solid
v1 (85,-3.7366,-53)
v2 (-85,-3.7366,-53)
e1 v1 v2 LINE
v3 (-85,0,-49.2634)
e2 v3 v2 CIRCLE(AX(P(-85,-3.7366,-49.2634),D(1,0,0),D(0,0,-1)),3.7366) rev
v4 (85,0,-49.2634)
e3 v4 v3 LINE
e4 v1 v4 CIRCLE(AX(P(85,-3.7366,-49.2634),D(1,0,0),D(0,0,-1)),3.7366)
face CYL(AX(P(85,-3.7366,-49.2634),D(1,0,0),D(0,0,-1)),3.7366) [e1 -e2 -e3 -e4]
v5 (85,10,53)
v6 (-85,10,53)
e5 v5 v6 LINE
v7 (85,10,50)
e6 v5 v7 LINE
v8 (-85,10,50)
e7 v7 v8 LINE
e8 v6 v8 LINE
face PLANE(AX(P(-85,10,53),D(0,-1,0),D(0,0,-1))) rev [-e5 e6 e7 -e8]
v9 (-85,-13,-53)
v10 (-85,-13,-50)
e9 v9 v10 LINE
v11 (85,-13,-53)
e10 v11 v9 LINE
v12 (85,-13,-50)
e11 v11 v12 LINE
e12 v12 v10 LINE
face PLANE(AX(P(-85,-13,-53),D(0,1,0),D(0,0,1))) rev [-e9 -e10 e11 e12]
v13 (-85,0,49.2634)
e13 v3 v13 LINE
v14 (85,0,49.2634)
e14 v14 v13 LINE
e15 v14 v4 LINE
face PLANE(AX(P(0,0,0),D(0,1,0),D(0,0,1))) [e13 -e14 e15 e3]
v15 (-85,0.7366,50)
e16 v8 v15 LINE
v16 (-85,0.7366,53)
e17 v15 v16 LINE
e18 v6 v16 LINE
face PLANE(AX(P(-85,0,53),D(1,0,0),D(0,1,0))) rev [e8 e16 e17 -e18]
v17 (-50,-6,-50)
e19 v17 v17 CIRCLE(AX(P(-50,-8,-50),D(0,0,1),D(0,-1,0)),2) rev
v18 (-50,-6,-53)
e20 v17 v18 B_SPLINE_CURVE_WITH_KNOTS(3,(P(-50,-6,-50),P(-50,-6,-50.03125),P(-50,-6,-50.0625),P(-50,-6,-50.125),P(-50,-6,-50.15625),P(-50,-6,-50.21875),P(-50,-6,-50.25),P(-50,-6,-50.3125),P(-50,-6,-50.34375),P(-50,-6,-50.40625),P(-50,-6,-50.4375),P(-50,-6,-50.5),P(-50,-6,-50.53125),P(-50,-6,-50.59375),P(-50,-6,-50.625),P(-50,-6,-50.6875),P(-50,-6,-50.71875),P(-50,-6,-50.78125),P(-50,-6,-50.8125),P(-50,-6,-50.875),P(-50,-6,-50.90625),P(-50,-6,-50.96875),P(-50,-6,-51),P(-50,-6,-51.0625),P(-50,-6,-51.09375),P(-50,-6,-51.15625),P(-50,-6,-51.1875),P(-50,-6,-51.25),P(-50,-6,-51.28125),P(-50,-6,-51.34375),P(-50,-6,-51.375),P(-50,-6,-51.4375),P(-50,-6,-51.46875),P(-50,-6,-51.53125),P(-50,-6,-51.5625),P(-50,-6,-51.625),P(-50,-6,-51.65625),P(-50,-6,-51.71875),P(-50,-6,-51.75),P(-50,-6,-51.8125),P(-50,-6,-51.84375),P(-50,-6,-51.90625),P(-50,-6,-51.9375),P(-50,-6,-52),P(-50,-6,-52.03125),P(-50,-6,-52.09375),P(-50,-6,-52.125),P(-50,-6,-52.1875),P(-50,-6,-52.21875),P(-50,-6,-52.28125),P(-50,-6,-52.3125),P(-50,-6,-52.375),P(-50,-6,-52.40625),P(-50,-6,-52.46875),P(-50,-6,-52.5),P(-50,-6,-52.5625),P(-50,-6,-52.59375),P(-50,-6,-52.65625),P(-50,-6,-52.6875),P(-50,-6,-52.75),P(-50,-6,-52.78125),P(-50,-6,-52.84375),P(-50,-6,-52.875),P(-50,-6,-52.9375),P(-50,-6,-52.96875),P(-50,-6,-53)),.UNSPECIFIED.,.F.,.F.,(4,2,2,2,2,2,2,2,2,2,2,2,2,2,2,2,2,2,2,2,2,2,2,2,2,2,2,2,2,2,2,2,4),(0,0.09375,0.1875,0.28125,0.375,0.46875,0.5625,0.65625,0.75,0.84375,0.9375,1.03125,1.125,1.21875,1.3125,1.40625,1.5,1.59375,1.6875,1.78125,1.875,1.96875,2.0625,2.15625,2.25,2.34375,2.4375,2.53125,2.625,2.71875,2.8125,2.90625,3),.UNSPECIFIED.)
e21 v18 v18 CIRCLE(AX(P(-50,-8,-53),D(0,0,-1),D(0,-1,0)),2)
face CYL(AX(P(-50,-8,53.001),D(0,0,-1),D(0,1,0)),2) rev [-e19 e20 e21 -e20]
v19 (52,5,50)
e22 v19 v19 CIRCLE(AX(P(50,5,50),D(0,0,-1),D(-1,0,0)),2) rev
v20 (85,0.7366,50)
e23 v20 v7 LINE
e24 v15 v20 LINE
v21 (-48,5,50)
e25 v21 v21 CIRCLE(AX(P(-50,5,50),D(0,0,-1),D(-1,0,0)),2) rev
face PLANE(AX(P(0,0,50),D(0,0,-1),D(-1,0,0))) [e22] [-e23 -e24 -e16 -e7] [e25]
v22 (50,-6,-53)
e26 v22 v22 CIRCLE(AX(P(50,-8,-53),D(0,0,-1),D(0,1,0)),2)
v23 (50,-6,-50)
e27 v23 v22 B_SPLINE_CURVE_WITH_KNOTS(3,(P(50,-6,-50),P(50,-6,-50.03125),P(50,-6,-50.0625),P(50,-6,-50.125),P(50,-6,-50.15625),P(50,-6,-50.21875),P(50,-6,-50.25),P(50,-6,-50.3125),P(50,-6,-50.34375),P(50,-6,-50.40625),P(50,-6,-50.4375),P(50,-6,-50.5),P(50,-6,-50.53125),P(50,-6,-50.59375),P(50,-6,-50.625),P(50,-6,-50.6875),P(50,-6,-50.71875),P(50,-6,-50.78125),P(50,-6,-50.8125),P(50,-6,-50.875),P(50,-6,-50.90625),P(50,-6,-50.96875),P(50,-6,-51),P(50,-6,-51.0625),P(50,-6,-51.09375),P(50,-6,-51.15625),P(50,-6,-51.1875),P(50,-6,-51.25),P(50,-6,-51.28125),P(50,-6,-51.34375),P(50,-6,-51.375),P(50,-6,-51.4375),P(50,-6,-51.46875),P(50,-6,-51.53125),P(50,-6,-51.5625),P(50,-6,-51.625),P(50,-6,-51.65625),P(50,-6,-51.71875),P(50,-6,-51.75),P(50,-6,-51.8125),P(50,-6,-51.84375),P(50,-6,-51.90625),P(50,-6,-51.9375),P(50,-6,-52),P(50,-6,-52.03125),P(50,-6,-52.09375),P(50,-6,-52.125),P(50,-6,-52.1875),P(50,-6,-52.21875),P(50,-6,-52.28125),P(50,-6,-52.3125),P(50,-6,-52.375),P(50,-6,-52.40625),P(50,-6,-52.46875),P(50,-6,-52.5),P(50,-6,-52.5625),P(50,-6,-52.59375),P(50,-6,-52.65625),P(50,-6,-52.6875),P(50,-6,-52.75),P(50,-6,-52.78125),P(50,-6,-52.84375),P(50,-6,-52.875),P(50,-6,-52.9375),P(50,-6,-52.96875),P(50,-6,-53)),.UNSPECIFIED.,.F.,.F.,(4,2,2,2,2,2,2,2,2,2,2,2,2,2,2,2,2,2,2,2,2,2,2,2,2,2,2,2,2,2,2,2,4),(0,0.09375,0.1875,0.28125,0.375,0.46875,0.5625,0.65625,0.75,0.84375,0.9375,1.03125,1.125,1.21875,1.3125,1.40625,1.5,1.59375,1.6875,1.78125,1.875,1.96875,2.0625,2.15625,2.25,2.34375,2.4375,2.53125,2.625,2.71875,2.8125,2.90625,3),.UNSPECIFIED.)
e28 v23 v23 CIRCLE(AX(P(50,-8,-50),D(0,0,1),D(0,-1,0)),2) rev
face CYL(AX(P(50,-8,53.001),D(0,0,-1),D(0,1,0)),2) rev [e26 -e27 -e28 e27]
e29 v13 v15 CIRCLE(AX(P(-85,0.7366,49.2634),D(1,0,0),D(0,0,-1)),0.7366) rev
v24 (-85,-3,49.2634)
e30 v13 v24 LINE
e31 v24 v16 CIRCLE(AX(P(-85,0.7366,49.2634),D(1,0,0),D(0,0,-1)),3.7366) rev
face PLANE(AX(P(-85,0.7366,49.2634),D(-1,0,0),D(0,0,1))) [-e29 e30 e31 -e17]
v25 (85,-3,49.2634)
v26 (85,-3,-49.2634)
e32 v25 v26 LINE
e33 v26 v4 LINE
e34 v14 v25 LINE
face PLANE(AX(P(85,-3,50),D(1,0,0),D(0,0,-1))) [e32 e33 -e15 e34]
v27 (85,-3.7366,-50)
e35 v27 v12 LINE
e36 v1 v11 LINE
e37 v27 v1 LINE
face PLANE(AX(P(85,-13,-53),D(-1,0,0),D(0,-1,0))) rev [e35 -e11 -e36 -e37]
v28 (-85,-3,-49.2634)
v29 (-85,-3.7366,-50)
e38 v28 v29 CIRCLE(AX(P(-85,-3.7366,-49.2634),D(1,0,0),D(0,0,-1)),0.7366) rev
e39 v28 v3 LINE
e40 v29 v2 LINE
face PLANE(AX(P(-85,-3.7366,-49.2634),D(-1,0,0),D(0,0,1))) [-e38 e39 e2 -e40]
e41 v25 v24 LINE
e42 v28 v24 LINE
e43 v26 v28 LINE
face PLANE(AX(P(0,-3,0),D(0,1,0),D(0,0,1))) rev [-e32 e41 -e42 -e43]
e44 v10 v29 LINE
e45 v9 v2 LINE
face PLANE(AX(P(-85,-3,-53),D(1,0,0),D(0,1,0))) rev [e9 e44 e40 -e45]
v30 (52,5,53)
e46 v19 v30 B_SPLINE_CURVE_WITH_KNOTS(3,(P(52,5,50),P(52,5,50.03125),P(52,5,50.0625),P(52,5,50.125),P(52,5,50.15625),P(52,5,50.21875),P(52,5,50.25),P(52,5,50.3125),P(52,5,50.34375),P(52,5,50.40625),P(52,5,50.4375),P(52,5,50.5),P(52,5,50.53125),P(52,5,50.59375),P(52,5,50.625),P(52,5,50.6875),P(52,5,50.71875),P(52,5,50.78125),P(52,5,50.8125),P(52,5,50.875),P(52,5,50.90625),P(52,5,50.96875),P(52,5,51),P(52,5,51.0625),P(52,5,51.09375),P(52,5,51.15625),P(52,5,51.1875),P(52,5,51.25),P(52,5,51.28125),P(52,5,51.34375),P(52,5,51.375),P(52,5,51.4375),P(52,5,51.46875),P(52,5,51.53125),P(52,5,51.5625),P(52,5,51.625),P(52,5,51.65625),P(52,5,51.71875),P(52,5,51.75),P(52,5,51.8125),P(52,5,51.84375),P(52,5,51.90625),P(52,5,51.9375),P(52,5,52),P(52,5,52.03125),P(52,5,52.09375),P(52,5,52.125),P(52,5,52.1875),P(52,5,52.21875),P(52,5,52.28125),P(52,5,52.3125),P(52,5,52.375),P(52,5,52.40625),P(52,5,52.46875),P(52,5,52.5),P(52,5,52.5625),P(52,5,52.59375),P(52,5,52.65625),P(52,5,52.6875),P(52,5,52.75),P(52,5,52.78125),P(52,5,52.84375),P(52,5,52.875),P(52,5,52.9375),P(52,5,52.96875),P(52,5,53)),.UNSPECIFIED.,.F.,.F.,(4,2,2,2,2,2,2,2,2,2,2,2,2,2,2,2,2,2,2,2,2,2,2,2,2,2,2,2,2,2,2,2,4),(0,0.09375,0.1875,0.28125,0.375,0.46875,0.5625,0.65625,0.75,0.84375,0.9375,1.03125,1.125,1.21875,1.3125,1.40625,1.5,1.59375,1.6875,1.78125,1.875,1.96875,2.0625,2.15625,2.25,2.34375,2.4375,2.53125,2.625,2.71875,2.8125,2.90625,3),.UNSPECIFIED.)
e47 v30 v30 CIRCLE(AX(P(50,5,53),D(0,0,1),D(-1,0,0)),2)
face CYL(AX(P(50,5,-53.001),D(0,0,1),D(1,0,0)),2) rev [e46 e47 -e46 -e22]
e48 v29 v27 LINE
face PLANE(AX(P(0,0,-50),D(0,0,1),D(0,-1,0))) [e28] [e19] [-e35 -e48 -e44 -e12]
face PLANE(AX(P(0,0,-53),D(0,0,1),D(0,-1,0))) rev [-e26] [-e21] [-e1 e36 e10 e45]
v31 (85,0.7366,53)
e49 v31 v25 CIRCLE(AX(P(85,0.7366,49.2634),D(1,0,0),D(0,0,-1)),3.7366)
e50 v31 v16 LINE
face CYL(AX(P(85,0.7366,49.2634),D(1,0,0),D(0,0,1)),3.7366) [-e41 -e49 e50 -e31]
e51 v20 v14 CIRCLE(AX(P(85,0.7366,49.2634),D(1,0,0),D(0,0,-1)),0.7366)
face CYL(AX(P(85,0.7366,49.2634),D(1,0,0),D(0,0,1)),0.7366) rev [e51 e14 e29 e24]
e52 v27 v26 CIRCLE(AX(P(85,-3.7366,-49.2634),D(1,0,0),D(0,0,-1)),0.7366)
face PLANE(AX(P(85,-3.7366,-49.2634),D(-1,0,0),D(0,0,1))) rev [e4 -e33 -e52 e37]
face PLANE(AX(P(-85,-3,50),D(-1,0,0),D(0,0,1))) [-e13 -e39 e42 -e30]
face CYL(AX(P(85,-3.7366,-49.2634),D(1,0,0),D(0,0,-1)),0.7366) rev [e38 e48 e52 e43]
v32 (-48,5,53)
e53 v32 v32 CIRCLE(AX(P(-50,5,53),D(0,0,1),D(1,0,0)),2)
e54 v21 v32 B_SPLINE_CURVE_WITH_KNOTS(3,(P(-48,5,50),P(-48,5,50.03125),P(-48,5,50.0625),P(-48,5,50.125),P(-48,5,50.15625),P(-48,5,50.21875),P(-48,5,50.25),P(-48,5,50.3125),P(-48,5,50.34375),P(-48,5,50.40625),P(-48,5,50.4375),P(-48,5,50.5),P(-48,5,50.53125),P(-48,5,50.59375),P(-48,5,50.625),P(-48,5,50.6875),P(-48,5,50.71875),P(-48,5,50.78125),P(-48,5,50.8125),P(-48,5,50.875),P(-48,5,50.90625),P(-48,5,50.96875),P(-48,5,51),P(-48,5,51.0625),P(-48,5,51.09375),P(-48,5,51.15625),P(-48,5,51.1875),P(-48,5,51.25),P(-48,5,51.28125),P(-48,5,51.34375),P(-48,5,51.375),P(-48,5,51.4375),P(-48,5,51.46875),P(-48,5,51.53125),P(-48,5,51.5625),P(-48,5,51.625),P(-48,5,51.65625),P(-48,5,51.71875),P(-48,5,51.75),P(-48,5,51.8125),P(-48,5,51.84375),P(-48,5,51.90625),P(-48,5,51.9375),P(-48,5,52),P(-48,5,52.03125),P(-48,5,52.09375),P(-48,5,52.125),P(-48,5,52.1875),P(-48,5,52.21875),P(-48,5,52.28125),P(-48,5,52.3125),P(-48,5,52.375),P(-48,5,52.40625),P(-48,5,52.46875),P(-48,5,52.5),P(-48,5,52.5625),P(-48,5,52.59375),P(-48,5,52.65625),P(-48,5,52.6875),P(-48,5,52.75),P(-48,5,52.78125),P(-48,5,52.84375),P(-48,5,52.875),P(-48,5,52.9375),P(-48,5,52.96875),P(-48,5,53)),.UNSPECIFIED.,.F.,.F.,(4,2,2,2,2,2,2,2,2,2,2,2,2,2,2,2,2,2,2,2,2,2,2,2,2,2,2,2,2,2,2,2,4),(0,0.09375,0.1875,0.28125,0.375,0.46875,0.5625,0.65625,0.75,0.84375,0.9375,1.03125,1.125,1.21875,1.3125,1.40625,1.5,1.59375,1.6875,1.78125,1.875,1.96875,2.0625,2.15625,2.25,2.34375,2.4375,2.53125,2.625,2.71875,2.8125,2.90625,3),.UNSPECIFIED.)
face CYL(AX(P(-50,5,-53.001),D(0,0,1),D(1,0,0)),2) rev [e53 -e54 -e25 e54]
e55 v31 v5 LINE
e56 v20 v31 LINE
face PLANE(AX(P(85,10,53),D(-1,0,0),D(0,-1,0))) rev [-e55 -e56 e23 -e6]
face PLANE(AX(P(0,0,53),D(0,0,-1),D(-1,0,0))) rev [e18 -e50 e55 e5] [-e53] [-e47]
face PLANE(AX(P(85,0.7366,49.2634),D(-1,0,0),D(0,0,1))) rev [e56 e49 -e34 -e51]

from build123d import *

# Parameters (mm, degrees)
SKETCH_1_W                       = 170
SKETCH_1_H                       = 100
SM_BASE_FLANGE_1_DEPTH           = 3
SM_EDGE_FLANGE_3_STRIP_W         = 13.4732
SM_EDGE_FLANGE_3_STRIP_H         = 3
SM_EDGE_FLANGE_3_STRIP_CUT_DEPTH = 170
SM_EDGE_FLANGE_3_DEPTH           = 170
SM_EDGE_FLANGE_4_STRIP_W         = 13.4732
SM_EDGE_FLANGE_4_STRIP_H         = 3
SM_EDGE_FLANGE_4_STRIP_CUT_DEPTH = 170
SM_EDGE_FLANGE_4_DEPTH           = 170
CUT_EXTRUDE_2_REACH              = 138.492
SKETCH_19_R                      = 2
CUT_EXTRUDE_3_REACH              = 138.492
SKETCH_20_R                      = 2


# Sheet-metal steps are written as plain solids
with BuildPart() as part:
    # Sketch 1 → 基体-法兰1 (new body)
    with BuildSketch(Plane(origin=(0, 0, 0), x_dir=(1, 0, 0), z_dir=(0, 1, 0))):
        Rectangle(SKETCH_1_W, SKETCH_1_H)
    extrude(amount=-SM_BASE_FLANGE_1_DEPTH)

    # 边线-法兰3 strip (across the edge) → 边线-法兰3 strip cut (cut)
    with BuildSketch(Plane(origin=(-85, 0, 50), x_dir=(0, 0, -1), z_dir=(1, 0, 0))):
        with Locations((-6, -1.5)):
            Rectangle(SM_EDGE_FLANGE_3_STRIP_W, SM_EDGE_FLANGE_3_STRIP_H)
    extrude(amount=SM_EDGE_FLANGE_3_STRIP_CUT_DEPTH, mode=Mode.SUBTRACT)

    # 边线-法兰3 section (across the edge) → 边线-法兰3 (add)
    with BuildSketch(Plane(origin=(-85, 0, 50), x_dir=(0, 0, -1), z_dir=(1, 0, 0))):
        with BuildLine():
            Line((-3, 0.7366), (-3, 10))
            Line((-3, 10), (0, 10))
            Line((0, 10), (0, 0.7366))
            ThreePointArc((0, 0.7366), (0.215745145, 0.215745145), (0.7366, 0))
            Line((0.7366, 0), (0.7366, -3))
            ThreePointArc((0.7366, -3), (-1.905575199, -1.905575199), (-3, 0.7366))
        make_face()
    extrude(amount=SM_EDGE_FLANGE_3_DEPTH)

    # 边线-法兰4 strip (across the edge) → 边线-法兰4 strip cut (cut)
    with BuildSketch(Plane(origin=(-85, -3, -50), x_dir=(0, 0, 1), z_dir=(1, 0, 0))):
        with Locations((-6, -1.5)):
            Rectangle(SM_EDGE_FLANGE_4_STRIP_W, SM_EDGE_FLANGE_4_STRIP_H)
    extrude(amount=SM_EDGE_FLANGE_4_STRIP_CUT_DEPTH, mode=Mode.SUBTRACT)

    # 边线-法兰4 section (across the edge) → 边线-法兰4 (add)
    with BuildSketch(Plane(origin=(-85, -3, -50), x_dir=(0, 0, 1), z_dir=(1, 0, 0))):
        with BuildLine():
            Line((-3, 0.7366), (-3, 10))
            Line((-3, 10), (0, 10))
            Line((0, 10), (0, 0.7366))
            ThreePointArc((0, 0.7366), (0.215745145, 0.215745145), (0.7366, 0))
            Line((0.7366, 0), (0.7366, -3))
            ThreePointArc((0.7366, -3), (-1.905575199, -1.905575199), (-3, 0.7366))
        make_face()
    extrude(amount=SM_EDGE_FLANGE_4_DEPTH)

    # 草图19 → 切除-拉伸2 (cut, up to next)
    with BuildSketch(Plane.XY.offset(53), mode=Mode.PRIVATE) as cut_extrude_2_sk1:
        with Locations((-50, 5)):
            Circle(SKETCH_19_R)
    cut_extrude_2_tool1 = extrude(cut_extrude_2_sk1.sketch, amount=-CUT_EXTRUDE_2_REACH, mode=Mode.PRIVATE) & part.part
    # 草图19 → 切除-拉伸2 (cut, up to next)
    with BuildSketch(Plane.XY.offset(53), mode=Mode.PRIVATE) as cut_extrude_2_sk2:
        with Locations((50, 5)):
            Circle(SKETCH_19_R)
    cut_extrude_2_tool2 = extrude(cut_extrude_2_sk2.sketch, amount=-CUT_EXTRUDE_2_REACH, mode=Mode.PRIVATE) & part.part
    add(cut_extrude_2_tool1.solids().sort_by_distance((-50, 5, 53))[0], mode=Mode.SUBTRACT)
    add(cut_extrude_2_tool2.solids().sort_by_distance((50, 5, 53))[0], mode=Mode.SUBTRACT)

    # 草图20 → 切除-拉伸3 (cut, up to next)
    with BuildSketch(Plane(origin=(0, 0, -53), x_dir=(-1, 0, 0), z_dir=(0, 0, -1)), mode=Mode.PRIVATE) as cut_extrude_3_sk1:
        with Locations(Location((-50, -8, 0), (0, 0, 90))):
            Circle(SKETCH_20_R)
    cut_extrude_3_tool1 = extrude(cut_extrude_3_sk1.sketch, amount=-CUT_EXTRUDE_3_REACH, mode=Mode.PRIVATE) & part.part
    # 草图20 → 切除-拉伸3 (cut, up to next)
    with BuildSketch(Plane(origin=(0, 0, -53), x_dir=(-1, 0, 0), z_dir=(0, 0, -1)), mode=Mode.PRIVATE) as cut_extrude_3_sk2:
        with Locations(Location((50, -8, 0), (0, 0, 90))):
            Circle(SKETCH_20_R)
    cut_extrude_3_tool2 = extrude(cut_extrude_3_sk2.sketch, amount=-CUT_EXTRUDE_3_REACH, mode=Mode.PRIVATE) & part.part
    add(cut_extrude_3_tool1.solids().sort_by_distance((50, -8, -53))[0], mode=Mode.SUBTRACT)
    add(cut_extrude_3_tool2.solids().sort_by_distance((-50, -8, -53))[0], mode=Mode.SUBTRACT)


solid = part.part
